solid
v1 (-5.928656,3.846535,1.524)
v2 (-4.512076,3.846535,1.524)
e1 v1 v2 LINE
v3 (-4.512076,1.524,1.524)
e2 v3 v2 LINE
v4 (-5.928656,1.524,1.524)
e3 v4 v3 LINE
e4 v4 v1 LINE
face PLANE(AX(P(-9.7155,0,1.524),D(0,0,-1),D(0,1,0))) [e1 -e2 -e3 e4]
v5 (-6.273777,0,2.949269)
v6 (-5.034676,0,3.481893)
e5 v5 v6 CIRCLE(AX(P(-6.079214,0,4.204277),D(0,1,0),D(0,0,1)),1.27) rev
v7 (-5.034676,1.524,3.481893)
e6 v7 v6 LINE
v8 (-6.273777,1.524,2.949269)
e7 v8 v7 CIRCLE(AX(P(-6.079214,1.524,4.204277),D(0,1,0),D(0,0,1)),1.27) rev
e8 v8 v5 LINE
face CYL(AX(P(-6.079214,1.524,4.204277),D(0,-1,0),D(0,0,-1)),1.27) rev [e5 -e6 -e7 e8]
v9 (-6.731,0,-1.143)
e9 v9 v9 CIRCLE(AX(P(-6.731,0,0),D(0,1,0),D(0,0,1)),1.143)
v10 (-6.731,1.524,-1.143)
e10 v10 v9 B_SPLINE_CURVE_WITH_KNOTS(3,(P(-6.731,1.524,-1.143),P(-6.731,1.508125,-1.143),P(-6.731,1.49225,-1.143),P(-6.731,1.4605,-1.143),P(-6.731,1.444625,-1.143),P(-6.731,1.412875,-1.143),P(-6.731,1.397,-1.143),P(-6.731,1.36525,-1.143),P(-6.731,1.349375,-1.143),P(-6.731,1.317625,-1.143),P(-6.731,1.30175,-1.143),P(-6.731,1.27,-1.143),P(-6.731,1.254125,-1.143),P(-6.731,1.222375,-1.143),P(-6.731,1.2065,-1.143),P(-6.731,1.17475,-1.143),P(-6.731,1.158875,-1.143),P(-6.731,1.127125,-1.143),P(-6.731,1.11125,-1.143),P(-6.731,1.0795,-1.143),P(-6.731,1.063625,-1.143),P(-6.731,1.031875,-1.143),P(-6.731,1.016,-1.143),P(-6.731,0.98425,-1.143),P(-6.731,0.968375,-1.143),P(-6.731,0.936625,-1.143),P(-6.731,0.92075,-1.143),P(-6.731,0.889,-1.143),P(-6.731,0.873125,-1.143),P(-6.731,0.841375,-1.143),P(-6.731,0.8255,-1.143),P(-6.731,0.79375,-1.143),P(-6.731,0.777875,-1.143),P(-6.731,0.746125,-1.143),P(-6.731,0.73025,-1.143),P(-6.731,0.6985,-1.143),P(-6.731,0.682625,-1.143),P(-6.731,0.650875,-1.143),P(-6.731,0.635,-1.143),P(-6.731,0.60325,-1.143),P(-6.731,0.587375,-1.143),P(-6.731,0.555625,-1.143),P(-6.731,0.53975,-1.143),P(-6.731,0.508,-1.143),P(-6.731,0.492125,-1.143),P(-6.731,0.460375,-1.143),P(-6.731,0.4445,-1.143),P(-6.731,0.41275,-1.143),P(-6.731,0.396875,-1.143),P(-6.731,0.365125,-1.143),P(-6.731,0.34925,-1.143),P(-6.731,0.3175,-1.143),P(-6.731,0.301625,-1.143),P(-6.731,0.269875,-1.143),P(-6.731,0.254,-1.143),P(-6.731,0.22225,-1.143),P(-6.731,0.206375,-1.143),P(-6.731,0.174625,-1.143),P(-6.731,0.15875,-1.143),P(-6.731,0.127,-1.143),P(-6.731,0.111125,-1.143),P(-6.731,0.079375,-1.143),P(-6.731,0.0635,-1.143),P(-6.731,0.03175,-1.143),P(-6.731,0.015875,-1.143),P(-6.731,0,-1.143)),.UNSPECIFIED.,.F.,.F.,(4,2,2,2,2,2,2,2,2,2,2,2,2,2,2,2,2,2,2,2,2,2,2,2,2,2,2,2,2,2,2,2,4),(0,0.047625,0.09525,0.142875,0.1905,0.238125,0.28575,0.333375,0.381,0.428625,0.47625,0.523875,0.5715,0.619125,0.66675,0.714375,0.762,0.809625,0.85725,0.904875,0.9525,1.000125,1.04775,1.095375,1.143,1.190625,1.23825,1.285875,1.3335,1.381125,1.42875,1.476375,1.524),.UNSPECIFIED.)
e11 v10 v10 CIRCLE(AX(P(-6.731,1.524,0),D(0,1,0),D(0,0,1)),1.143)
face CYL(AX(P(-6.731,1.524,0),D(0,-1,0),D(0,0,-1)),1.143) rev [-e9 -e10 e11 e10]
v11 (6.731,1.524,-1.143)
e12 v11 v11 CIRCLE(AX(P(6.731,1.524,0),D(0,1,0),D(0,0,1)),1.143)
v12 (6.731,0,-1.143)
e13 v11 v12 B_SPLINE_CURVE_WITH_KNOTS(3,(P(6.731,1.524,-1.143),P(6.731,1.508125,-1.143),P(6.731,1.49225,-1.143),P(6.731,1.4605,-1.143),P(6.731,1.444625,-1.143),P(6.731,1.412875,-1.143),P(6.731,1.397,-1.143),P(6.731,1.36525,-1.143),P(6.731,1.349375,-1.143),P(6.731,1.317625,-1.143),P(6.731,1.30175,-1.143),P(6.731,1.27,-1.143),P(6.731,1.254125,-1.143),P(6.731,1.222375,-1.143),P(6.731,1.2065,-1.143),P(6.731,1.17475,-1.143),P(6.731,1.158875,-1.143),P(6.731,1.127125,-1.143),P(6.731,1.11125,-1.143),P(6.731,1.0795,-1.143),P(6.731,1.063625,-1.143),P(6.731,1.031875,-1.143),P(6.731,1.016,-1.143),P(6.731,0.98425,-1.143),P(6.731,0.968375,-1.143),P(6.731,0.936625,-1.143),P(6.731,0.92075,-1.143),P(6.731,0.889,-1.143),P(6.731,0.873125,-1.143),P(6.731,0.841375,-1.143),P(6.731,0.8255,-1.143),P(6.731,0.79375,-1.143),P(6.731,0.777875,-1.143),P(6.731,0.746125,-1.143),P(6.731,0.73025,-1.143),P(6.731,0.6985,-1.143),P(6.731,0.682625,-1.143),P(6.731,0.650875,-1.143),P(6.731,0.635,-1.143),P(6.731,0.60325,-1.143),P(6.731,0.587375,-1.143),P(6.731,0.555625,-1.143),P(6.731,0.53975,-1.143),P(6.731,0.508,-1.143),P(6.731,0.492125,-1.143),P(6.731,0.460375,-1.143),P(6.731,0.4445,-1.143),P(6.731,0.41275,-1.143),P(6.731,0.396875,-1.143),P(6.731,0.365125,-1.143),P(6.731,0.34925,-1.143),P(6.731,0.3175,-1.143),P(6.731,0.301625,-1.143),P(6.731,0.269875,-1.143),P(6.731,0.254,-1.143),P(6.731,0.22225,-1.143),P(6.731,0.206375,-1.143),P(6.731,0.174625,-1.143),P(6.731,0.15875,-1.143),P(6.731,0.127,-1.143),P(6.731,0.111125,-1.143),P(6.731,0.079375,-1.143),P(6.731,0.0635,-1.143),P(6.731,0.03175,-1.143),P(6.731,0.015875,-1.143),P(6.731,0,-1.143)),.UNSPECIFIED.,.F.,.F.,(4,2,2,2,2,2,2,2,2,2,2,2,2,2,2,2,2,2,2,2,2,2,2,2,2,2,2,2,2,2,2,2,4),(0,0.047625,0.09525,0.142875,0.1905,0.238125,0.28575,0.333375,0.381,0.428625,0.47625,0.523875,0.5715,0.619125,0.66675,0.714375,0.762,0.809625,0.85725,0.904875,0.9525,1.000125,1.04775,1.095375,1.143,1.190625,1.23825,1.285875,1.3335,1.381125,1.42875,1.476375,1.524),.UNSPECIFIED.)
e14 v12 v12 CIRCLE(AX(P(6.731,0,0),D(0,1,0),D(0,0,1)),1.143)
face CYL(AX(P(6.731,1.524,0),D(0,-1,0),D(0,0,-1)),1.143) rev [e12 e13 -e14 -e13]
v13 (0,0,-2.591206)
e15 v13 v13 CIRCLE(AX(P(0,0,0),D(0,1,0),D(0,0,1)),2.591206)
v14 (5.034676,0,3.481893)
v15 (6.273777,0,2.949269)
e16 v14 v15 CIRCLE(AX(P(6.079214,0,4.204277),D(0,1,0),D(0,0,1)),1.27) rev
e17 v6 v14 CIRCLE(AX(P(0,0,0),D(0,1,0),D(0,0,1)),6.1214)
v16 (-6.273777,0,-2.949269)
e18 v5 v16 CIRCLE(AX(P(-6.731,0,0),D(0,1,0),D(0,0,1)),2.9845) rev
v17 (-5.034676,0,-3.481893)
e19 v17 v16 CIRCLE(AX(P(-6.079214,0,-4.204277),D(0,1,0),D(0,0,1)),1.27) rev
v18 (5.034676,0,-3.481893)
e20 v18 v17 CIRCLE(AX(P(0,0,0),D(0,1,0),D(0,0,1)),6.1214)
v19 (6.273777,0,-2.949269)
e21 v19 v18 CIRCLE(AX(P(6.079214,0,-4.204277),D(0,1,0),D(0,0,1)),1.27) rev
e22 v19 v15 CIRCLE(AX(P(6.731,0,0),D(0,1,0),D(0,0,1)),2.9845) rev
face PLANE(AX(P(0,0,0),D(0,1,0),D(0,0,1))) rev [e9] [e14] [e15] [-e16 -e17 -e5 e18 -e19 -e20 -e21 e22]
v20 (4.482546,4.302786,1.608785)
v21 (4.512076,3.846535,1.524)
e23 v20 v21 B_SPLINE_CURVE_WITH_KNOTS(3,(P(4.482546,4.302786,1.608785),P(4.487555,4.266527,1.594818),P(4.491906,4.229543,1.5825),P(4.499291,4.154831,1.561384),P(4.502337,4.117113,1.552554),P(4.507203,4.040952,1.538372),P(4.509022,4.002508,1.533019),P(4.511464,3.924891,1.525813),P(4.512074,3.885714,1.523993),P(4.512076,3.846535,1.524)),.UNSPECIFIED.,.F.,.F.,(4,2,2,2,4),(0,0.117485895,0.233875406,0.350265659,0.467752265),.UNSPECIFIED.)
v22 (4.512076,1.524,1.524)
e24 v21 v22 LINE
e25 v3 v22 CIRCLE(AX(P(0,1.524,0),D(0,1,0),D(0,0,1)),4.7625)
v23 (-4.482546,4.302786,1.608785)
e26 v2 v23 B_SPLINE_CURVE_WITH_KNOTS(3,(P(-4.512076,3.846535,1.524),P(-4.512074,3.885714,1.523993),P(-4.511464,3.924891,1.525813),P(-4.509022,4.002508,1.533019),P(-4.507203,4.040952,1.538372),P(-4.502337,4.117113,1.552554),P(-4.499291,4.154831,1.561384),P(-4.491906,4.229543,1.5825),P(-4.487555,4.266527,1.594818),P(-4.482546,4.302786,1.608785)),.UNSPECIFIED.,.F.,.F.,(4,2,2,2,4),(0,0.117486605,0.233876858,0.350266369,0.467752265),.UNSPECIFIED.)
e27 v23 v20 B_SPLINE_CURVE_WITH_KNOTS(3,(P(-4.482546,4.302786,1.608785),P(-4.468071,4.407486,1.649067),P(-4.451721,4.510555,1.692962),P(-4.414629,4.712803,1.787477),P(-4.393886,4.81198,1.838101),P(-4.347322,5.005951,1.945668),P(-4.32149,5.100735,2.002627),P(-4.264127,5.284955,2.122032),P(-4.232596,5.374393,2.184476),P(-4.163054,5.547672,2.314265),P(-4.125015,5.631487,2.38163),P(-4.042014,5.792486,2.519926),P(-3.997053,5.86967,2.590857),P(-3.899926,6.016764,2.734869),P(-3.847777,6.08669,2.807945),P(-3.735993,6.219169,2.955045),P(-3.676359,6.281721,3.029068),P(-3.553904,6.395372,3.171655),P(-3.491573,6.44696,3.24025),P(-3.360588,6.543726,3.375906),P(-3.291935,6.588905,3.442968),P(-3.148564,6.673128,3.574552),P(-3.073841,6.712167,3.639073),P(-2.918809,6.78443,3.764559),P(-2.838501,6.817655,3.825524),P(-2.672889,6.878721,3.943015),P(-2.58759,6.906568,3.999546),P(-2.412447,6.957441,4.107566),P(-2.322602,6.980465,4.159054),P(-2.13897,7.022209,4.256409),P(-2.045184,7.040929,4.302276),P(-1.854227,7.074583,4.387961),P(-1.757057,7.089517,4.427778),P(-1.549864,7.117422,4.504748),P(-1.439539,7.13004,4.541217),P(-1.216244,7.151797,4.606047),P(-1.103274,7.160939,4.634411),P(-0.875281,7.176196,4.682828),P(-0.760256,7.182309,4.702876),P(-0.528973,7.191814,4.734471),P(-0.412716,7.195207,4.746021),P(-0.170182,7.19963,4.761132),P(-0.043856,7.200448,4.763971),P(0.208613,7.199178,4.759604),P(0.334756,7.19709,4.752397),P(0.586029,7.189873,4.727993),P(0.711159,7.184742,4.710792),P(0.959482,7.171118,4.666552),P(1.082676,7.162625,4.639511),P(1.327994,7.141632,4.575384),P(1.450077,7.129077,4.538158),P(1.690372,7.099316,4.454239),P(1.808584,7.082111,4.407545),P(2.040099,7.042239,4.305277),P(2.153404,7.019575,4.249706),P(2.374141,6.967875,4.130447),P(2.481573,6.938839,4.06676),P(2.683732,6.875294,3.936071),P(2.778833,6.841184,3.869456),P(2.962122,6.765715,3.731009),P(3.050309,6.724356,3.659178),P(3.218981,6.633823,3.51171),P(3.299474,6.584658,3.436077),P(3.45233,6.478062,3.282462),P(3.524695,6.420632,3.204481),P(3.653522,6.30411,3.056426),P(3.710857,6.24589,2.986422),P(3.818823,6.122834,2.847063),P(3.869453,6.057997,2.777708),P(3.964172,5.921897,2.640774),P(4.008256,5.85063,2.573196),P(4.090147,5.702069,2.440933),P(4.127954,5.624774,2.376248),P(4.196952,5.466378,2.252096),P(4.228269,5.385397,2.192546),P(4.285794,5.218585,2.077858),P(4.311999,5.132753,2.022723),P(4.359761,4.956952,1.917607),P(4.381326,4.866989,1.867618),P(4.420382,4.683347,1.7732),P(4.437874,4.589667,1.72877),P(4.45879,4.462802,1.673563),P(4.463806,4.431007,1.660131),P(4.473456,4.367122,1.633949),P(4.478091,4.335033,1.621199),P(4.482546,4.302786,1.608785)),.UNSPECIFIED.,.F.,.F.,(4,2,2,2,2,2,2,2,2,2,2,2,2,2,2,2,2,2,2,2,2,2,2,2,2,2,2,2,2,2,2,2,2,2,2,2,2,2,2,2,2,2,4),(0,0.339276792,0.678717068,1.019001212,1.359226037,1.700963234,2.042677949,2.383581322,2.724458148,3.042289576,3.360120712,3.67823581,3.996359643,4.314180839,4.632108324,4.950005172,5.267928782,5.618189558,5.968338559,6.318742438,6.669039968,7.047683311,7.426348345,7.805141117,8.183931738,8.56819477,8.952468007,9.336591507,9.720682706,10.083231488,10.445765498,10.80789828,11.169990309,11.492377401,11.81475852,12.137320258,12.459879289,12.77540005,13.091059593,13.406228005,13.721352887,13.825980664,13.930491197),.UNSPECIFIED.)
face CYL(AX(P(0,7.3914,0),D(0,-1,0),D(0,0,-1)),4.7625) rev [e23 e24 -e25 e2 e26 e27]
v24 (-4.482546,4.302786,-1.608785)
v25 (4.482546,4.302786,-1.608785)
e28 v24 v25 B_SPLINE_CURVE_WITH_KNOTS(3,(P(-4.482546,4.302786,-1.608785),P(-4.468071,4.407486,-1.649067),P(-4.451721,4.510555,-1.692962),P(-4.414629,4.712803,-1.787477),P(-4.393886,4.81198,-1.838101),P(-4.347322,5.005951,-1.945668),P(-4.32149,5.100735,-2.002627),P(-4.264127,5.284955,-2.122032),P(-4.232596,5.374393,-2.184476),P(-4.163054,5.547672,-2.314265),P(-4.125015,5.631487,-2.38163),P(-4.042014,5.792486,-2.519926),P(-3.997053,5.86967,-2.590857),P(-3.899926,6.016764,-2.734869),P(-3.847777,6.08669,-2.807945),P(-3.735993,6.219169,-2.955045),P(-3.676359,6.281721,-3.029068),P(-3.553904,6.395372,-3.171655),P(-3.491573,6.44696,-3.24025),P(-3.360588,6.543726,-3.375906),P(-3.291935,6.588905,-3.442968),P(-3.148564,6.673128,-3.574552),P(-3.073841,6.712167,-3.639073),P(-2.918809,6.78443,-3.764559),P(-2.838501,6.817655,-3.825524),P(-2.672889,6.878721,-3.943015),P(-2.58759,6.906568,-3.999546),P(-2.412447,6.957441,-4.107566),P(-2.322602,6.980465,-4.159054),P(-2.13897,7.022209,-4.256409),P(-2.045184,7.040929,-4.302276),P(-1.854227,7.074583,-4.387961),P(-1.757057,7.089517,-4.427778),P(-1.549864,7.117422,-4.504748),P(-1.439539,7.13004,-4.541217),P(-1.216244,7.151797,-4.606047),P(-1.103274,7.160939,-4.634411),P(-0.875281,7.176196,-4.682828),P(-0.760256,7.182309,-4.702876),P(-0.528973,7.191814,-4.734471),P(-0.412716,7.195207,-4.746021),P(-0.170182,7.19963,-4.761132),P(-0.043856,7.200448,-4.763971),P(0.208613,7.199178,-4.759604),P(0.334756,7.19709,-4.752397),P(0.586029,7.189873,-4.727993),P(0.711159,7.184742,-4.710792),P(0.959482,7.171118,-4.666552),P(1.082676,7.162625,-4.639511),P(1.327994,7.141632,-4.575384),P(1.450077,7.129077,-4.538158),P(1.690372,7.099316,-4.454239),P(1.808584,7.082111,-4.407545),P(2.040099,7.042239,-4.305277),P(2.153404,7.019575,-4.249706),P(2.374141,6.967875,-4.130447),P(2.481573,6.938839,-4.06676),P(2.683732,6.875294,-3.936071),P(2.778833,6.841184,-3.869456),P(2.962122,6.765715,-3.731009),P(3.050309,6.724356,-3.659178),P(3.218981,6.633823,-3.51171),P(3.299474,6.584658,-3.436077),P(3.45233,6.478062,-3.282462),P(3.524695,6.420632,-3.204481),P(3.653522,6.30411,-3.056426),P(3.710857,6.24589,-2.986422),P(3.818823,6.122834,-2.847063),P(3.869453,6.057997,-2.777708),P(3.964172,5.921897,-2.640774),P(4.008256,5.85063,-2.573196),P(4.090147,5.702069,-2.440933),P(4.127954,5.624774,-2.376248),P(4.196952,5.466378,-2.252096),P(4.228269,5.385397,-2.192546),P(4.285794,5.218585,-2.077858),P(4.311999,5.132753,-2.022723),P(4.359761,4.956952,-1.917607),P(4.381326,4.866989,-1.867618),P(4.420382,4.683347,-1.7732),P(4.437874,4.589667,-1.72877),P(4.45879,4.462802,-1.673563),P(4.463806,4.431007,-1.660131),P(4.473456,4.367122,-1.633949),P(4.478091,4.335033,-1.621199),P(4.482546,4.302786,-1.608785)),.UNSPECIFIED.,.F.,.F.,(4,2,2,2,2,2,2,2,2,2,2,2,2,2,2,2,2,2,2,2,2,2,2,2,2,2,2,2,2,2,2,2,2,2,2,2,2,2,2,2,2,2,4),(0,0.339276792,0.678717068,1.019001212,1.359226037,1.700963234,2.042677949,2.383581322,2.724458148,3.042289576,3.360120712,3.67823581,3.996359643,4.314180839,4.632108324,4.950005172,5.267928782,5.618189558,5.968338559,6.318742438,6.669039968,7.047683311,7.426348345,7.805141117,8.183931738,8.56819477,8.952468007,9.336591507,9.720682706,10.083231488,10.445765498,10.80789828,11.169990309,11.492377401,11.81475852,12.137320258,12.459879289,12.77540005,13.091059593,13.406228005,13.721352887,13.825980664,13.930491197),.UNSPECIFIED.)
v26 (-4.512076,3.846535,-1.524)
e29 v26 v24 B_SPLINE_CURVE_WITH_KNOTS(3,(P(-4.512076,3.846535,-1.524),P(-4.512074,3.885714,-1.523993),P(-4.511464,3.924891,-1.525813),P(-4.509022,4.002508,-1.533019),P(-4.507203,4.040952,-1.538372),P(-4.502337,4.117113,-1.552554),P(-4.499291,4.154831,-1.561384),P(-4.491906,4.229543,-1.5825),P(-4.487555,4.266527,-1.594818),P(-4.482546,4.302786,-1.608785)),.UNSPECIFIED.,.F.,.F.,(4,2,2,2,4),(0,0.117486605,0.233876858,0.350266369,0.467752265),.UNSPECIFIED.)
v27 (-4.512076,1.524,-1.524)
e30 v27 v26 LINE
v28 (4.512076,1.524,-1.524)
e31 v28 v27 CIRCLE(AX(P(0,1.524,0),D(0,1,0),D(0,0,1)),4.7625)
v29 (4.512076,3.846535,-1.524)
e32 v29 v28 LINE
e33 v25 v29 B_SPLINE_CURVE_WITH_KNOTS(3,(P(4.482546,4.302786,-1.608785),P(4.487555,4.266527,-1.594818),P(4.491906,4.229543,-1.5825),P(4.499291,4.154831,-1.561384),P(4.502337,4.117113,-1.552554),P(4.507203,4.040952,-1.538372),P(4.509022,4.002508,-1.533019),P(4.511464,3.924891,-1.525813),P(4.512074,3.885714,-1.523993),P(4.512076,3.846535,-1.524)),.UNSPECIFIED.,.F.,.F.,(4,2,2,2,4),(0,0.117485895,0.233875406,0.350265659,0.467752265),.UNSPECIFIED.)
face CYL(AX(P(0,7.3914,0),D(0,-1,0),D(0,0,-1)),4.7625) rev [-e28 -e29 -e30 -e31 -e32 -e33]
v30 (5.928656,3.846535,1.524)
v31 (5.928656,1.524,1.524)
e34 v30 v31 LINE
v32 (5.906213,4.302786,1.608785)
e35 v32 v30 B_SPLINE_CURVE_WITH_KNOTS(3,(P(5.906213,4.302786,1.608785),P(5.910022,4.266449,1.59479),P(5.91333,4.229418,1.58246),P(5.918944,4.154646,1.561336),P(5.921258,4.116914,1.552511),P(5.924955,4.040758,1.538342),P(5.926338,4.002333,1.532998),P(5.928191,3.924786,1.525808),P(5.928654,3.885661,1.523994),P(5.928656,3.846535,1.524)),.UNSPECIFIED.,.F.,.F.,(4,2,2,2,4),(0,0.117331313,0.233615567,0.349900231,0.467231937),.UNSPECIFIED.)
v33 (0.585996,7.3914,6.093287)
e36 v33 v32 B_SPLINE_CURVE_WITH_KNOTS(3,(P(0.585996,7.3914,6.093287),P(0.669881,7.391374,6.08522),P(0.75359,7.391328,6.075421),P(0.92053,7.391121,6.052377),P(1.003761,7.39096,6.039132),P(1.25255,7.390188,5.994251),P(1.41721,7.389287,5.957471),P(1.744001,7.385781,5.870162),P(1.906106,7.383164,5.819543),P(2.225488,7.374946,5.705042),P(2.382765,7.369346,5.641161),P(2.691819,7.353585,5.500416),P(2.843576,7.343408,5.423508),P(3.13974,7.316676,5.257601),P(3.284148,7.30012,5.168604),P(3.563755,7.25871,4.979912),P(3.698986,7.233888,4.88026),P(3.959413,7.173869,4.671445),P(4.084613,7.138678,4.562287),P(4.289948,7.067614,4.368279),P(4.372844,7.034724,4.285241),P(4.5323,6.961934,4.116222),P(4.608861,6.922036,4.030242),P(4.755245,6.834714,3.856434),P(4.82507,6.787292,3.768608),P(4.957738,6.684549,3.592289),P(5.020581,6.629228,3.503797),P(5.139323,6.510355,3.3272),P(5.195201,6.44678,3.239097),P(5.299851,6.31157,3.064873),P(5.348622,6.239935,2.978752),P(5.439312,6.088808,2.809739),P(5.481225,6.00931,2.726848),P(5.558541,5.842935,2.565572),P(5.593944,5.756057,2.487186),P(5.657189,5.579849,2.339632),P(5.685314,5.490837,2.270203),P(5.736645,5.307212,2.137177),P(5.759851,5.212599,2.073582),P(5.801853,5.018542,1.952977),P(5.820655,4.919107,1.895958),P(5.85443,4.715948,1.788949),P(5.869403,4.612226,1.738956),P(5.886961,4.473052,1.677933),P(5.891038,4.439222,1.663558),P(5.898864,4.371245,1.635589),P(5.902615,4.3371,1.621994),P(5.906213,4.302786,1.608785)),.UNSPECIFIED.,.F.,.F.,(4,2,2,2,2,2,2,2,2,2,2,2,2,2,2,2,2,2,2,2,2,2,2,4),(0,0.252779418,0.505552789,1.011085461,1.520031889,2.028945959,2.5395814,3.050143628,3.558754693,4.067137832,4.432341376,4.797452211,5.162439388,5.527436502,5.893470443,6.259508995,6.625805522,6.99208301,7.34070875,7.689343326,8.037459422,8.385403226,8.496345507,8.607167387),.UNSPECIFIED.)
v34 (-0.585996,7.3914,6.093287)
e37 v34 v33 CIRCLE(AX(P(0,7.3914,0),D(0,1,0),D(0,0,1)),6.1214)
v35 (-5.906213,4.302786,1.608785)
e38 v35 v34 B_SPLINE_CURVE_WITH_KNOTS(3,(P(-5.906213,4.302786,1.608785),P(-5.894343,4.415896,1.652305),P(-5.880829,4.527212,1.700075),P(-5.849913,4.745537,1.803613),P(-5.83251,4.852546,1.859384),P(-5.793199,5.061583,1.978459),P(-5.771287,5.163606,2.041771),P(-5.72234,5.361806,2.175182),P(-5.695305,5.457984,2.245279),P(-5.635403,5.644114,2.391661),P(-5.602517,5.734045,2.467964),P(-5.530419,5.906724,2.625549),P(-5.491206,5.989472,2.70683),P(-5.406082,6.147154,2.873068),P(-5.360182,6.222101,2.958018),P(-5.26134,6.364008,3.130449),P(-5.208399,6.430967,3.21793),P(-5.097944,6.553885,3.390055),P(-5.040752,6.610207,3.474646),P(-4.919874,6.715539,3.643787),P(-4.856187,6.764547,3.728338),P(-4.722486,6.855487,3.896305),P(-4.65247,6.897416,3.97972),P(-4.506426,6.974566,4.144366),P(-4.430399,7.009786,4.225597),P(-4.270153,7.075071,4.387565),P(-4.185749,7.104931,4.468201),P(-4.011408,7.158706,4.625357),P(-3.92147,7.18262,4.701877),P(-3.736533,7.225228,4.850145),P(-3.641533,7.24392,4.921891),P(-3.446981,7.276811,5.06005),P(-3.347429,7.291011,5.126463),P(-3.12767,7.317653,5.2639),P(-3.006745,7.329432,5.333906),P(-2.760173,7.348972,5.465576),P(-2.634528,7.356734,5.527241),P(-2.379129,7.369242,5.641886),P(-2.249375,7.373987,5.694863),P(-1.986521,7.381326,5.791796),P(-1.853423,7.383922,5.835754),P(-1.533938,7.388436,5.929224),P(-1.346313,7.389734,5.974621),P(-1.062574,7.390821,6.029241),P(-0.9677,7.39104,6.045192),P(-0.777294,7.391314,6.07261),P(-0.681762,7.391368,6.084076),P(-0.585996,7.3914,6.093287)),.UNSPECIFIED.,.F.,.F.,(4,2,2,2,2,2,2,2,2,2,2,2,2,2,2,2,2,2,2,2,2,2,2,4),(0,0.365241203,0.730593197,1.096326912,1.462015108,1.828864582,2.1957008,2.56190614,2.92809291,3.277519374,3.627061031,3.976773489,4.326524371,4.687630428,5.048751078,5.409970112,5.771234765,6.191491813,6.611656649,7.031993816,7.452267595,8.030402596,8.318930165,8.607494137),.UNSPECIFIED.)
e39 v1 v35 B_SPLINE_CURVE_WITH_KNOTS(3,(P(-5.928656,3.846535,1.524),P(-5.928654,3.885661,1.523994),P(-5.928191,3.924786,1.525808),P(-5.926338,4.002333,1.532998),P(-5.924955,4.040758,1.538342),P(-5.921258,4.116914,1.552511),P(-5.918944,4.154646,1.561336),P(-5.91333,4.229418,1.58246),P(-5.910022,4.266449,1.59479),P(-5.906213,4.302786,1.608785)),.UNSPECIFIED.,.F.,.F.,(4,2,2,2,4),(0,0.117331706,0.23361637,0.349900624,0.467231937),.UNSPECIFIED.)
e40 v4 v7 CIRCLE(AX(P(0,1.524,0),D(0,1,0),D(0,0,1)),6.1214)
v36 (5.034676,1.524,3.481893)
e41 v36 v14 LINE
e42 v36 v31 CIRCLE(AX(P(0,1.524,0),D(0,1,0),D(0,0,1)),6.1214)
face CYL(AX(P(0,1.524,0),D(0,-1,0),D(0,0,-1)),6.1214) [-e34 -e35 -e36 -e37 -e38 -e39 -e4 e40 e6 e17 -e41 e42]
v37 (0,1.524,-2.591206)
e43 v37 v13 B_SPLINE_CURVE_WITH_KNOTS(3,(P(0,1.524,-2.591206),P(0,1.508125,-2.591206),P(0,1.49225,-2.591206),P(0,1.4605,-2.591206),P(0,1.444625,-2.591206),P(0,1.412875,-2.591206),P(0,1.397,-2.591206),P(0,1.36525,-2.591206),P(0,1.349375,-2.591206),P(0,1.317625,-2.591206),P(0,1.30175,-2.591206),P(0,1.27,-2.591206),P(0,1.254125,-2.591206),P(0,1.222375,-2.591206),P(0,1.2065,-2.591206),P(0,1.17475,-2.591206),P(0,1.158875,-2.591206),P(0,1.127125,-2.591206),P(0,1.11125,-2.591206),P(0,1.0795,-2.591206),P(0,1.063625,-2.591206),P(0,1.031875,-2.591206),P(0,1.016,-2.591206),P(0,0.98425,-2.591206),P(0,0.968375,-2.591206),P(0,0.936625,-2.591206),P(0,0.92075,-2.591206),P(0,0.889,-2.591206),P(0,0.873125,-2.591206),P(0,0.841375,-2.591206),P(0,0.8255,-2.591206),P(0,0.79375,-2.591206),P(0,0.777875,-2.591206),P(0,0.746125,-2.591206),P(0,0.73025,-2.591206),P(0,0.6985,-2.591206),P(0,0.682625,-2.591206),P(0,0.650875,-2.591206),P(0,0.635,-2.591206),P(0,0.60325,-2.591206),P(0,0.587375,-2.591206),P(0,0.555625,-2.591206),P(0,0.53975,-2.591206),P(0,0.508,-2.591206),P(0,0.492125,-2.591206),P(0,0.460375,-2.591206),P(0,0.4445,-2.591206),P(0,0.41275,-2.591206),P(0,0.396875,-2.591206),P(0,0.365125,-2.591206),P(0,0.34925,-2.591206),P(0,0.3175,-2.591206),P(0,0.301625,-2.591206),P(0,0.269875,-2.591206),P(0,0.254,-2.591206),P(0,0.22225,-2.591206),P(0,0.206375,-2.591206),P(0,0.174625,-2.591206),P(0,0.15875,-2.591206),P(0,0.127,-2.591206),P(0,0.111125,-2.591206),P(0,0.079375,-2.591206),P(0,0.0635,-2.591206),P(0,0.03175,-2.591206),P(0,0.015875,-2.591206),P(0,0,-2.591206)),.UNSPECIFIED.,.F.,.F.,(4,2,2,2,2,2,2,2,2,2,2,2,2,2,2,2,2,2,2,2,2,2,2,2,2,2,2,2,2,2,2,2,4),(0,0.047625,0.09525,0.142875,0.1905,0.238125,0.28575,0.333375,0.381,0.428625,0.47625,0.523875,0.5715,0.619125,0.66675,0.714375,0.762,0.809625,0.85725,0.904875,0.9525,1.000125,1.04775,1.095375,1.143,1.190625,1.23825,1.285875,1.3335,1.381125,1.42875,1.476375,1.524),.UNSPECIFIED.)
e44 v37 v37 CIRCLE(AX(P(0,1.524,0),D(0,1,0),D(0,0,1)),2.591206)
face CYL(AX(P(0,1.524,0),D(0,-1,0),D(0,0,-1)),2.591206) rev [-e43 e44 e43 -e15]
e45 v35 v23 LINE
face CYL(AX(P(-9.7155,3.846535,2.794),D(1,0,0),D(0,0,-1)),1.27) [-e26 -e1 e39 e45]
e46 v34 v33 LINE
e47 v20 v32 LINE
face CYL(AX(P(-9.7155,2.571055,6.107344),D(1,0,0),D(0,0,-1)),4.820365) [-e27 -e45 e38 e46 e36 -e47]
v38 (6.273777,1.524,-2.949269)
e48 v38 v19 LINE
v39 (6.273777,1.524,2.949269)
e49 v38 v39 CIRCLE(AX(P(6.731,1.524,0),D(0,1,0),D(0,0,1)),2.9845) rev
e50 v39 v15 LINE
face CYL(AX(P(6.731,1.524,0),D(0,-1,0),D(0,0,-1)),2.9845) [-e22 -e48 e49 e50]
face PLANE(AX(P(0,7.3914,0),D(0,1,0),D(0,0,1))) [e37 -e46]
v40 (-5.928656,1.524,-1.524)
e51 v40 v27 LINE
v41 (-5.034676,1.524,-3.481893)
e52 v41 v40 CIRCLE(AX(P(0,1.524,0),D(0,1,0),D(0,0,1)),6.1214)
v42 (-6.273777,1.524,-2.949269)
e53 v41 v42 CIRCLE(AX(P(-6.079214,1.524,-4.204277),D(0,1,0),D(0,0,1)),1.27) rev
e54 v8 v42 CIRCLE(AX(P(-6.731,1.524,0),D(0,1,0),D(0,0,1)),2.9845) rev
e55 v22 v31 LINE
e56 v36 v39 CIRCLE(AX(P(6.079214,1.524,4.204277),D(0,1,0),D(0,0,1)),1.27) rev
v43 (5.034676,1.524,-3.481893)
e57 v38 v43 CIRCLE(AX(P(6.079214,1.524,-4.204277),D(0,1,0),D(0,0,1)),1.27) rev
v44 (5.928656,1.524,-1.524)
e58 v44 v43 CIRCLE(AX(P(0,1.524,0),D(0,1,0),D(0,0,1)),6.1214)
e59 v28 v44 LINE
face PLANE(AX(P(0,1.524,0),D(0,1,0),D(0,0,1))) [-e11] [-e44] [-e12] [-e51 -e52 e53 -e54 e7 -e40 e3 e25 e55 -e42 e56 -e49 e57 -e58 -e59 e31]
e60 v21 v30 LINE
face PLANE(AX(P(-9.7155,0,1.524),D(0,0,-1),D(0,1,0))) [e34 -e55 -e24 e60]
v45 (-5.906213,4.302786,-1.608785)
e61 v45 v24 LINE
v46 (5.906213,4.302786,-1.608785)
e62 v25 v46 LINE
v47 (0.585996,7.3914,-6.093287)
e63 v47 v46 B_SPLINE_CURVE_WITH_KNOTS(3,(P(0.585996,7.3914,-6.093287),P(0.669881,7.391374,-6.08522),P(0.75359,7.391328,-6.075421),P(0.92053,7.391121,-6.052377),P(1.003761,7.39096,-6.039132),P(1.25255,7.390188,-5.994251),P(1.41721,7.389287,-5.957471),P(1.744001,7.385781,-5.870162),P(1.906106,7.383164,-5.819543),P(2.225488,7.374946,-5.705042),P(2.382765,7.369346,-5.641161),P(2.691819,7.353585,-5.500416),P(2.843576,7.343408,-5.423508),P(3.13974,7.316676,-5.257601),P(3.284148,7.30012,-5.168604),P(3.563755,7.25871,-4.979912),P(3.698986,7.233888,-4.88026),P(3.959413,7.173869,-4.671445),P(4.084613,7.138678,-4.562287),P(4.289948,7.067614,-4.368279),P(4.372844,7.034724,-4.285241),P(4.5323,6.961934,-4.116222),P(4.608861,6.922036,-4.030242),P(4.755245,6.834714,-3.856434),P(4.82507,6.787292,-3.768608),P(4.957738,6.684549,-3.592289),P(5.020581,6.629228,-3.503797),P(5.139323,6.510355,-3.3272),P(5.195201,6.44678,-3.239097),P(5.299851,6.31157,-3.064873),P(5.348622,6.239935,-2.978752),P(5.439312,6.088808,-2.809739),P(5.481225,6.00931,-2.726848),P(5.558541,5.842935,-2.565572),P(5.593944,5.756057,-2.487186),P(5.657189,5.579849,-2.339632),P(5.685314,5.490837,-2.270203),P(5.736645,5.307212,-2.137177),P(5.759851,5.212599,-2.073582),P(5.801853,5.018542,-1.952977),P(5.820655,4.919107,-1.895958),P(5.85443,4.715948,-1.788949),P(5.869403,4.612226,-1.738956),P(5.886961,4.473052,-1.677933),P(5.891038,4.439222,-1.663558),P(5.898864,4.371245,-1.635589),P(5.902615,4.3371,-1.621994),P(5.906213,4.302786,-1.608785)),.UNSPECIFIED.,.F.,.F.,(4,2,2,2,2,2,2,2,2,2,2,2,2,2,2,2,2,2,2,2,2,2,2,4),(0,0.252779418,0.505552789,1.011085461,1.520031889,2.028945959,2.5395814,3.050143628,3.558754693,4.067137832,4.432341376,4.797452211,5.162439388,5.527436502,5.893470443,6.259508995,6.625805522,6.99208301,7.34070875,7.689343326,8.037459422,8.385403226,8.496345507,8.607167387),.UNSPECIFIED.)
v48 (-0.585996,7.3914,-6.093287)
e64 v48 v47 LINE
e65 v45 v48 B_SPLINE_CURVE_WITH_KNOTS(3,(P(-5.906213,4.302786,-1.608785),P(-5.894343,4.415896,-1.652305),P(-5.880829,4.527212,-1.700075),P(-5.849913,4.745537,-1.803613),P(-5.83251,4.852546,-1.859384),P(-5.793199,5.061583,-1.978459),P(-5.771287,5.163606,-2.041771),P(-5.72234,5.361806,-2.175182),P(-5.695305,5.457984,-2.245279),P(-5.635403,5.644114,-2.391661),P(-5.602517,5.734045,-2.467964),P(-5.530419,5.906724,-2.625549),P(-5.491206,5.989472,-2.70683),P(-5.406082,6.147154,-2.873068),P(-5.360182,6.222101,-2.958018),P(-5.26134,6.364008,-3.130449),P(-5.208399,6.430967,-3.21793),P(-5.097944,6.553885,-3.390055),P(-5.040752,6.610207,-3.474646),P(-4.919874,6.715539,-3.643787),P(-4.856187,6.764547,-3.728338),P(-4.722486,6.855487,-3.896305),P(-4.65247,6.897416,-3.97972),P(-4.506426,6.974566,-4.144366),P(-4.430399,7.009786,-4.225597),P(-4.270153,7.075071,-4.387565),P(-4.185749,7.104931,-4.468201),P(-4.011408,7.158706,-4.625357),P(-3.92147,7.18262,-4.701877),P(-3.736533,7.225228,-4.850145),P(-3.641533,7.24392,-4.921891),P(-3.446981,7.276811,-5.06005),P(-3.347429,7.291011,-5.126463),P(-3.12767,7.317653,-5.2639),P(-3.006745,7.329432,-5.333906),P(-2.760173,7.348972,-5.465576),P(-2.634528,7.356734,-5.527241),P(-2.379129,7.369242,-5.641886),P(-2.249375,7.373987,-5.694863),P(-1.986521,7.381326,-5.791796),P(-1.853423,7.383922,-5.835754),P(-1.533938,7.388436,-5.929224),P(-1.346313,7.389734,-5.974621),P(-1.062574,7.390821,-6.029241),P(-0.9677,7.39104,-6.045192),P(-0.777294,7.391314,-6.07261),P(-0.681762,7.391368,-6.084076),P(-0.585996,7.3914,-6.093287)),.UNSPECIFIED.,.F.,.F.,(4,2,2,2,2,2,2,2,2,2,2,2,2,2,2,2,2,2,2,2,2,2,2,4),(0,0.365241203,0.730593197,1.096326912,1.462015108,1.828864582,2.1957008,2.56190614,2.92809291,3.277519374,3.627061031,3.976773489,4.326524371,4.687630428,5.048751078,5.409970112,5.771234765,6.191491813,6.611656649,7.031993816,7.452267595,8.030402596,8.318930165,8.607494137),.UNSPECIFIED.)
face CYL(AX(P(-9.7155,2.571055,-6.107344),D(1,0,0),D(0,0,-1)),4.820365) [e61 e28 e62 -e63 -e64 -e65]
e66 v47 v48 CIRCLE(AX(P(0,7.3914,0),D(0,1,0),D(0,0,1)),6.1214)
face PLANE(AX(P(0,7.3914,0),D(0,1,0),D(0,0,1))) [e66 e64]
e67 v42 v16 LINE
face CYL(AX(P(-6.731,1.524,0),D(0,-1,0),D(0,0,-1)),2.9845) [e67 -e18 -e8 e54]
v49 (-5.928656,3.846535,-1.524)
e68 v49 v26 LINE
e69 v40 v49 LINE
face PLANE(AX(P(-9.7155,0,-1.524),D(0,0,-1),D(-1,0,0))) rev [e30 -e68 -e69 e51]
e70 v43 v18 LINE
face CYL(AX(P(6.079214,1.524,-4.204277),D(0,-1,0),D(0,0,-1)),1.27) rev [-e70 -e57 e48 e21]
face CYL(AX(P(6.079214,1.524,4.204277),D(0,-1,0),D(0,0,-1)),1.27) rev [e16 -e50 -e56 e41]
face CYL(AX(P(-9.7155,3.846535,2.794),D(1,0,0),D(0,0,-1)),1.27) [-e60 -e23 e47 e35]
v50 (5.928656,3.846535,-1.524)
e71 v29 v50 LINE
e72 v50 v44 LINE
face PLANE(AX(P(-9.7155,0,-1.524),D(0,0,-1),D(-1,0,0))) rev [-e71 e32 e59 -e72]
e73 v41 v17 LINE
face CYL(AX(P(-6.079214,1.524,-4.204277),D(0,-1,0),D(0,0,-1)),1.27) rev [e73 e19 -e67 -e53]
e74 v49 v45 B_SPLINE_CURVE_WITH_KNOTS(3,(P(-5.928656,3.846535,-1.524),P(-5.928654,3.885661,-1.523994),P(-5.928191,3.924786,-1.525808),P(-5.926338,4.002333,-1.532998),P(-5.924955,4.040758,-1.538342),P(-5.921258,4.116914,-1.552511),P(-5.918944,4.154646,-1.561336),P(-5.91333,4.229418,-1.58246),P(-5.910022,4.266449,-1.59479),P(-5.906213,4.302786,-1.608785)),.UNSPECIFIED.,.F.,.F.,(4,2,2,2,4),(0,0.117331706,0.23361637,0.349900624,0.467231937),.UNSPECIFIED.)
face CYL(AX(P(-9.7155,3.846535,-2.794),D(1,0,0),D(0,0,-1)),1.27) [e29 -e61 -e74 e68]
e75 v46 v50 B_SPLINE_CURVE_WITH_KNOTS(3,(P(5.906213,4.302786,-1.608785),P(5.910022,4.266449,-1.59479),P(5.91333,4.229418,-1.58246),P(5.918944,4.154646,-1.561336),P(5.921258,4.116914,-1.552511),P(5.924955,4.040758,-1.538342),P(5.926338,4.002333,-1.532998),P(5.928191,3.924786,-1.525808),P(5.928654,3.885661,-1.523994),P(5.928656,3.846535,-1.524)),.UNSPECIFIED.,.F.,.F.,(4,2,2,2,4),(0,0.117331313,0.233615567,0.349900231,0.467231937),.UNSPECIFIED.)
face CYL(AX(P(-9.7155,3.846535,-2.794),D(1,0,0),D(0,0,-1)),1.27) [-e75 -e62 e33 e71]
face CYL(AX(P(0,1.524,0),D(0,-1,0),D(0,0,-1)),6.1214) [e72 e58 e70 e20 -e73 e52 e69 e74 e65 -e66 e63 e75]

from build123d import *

# Parameters (mm, degrees)
SKETCH1_R               = 2.591205892
SKETCH1_R_2             = 1.143
BOSS_EXTRUDE4_DEPTH     = 1.524
SKETCH5_R               = 6.1214
SKETCH5_R_2             = 4.7625
BOSS_EXTRUDE6_DEPTH     = 5.8674
CUT_EXTRUDE1_DEPTH      = 14.656327184
CUT_EXTRUDE1_DEPTH_BACK = 14.656327184


with BuildPart() as part:
    # Sketch1 → Boss-Extrude4 (new body)
    with BuildSketch(Plane(origin=(0, 0, 0), x_dir=(1, 0, 0), z_dir=(0, 1, 0))):
        with BuildLine():
            ThreePointArc((6.273777289, -2.949269001), (9.7155, 0), (6.273777289, 2.949269001))
            ThreePointArc((6.273777289, 2.949269001), (5.577680109, 3.037502335), (5.034675871, 3.481892708))
            ThreePointArc((5.034675871, 3.481892708), (0, 6.1214), (-5.034675871, 3.481892708))
            ThreePointArc((-5.034675871, 3.481892708), (-5.577680109, 3.037502335), (-6.273777289, 2.949269001))
            ThreePointArc((-6.273777289, 2.949269001), (-9.7155, 0), (-6.273777289, -2.949269001))
            ThreePointArc((-6.273777289, -2.949269001), (-5.577680109, -3.037502335), (-5.034675871, -3.481892708))
            ThreePointArc((-5.034675871, -3.481892708), (0, -6.1214), (5.034675871, -3.481892708))
            ThreePointArc((5.034675871, -3.481892708), (5.577680109, -3.037502335), (6.273777289, -2.949269001))
        make_face()
        Circle(SKETCH1_R, mode=Mode.SUBTRACT)
        with Locations((6.731, 0)):
            Circle(SKETCH1_R_2, mode=Mode.SUBTRACT)
        with Locations((-6.731, 0)):
            Circle(SKETCH1_R_2, mode=Mode.SUBTRACT)
    extrude(amount=BOSS_EXTRUDE4_DEPTH)

    # Sketch5 → Boss-Extrude6 (add)
    with BuildSketch(Plane(origin=(0, 1.524, 0), x_dir=(1, 0, 0), z_dir=(0, 1, 0))):
        Circle(SKETCH5_R)
        Circle(SKETCH5_R_2, mode=Mode.SUBTRACT)
    extrude(amount=BOSS_EXTRUDE6_DEPTH)

    # Sketch6 → Cut-Extrude1 (cut, two sides: drawn at the far end of the back side and taken through both)
    with BuildSketch(Plane(origin=(0, 0, 0), x_dir=(0, 0, -1), z_dir=(1, 0, 0)).offset(-CUT_EXTRUDE1_DEPTH_BACK)):
        with BuildLine():
            Line((-1.524, 3.846535004), (-1.524, 1.524))
            Line((-1.524, 1.524), (1.524, 1.524))
            Line((1.524, 1.524), (1.524, 3.846535004))
            ThreePointArc((1.524, 3.846535004), (1.545376148, 4.078566202), (1.608785003, 4.302786482))
            ThreePointArc((1.608785003, 4.302786482), (3.384739438, 6.548912496), (6.1214, 7.3914))
            Line((6.1214, 7.3914), (-6.1214, 7.3914))
            ThreePointArc((-6.1214, 7.3914), (-3.384739438, 6.548912496), (-1.608785003, 4.302786482))
            ThreePointArc((-1.608785003, 4.302786482), (-1.545376148, 4.078566202), (-1.524, 3.846535004))
        make_face()
    extrude(amount=CUT_EXTRUDE1_DEPTH + CUT_EXTRUDE1_DEPTH_BACK, mode=Mode.SUBTRACT)


solid = part.part
